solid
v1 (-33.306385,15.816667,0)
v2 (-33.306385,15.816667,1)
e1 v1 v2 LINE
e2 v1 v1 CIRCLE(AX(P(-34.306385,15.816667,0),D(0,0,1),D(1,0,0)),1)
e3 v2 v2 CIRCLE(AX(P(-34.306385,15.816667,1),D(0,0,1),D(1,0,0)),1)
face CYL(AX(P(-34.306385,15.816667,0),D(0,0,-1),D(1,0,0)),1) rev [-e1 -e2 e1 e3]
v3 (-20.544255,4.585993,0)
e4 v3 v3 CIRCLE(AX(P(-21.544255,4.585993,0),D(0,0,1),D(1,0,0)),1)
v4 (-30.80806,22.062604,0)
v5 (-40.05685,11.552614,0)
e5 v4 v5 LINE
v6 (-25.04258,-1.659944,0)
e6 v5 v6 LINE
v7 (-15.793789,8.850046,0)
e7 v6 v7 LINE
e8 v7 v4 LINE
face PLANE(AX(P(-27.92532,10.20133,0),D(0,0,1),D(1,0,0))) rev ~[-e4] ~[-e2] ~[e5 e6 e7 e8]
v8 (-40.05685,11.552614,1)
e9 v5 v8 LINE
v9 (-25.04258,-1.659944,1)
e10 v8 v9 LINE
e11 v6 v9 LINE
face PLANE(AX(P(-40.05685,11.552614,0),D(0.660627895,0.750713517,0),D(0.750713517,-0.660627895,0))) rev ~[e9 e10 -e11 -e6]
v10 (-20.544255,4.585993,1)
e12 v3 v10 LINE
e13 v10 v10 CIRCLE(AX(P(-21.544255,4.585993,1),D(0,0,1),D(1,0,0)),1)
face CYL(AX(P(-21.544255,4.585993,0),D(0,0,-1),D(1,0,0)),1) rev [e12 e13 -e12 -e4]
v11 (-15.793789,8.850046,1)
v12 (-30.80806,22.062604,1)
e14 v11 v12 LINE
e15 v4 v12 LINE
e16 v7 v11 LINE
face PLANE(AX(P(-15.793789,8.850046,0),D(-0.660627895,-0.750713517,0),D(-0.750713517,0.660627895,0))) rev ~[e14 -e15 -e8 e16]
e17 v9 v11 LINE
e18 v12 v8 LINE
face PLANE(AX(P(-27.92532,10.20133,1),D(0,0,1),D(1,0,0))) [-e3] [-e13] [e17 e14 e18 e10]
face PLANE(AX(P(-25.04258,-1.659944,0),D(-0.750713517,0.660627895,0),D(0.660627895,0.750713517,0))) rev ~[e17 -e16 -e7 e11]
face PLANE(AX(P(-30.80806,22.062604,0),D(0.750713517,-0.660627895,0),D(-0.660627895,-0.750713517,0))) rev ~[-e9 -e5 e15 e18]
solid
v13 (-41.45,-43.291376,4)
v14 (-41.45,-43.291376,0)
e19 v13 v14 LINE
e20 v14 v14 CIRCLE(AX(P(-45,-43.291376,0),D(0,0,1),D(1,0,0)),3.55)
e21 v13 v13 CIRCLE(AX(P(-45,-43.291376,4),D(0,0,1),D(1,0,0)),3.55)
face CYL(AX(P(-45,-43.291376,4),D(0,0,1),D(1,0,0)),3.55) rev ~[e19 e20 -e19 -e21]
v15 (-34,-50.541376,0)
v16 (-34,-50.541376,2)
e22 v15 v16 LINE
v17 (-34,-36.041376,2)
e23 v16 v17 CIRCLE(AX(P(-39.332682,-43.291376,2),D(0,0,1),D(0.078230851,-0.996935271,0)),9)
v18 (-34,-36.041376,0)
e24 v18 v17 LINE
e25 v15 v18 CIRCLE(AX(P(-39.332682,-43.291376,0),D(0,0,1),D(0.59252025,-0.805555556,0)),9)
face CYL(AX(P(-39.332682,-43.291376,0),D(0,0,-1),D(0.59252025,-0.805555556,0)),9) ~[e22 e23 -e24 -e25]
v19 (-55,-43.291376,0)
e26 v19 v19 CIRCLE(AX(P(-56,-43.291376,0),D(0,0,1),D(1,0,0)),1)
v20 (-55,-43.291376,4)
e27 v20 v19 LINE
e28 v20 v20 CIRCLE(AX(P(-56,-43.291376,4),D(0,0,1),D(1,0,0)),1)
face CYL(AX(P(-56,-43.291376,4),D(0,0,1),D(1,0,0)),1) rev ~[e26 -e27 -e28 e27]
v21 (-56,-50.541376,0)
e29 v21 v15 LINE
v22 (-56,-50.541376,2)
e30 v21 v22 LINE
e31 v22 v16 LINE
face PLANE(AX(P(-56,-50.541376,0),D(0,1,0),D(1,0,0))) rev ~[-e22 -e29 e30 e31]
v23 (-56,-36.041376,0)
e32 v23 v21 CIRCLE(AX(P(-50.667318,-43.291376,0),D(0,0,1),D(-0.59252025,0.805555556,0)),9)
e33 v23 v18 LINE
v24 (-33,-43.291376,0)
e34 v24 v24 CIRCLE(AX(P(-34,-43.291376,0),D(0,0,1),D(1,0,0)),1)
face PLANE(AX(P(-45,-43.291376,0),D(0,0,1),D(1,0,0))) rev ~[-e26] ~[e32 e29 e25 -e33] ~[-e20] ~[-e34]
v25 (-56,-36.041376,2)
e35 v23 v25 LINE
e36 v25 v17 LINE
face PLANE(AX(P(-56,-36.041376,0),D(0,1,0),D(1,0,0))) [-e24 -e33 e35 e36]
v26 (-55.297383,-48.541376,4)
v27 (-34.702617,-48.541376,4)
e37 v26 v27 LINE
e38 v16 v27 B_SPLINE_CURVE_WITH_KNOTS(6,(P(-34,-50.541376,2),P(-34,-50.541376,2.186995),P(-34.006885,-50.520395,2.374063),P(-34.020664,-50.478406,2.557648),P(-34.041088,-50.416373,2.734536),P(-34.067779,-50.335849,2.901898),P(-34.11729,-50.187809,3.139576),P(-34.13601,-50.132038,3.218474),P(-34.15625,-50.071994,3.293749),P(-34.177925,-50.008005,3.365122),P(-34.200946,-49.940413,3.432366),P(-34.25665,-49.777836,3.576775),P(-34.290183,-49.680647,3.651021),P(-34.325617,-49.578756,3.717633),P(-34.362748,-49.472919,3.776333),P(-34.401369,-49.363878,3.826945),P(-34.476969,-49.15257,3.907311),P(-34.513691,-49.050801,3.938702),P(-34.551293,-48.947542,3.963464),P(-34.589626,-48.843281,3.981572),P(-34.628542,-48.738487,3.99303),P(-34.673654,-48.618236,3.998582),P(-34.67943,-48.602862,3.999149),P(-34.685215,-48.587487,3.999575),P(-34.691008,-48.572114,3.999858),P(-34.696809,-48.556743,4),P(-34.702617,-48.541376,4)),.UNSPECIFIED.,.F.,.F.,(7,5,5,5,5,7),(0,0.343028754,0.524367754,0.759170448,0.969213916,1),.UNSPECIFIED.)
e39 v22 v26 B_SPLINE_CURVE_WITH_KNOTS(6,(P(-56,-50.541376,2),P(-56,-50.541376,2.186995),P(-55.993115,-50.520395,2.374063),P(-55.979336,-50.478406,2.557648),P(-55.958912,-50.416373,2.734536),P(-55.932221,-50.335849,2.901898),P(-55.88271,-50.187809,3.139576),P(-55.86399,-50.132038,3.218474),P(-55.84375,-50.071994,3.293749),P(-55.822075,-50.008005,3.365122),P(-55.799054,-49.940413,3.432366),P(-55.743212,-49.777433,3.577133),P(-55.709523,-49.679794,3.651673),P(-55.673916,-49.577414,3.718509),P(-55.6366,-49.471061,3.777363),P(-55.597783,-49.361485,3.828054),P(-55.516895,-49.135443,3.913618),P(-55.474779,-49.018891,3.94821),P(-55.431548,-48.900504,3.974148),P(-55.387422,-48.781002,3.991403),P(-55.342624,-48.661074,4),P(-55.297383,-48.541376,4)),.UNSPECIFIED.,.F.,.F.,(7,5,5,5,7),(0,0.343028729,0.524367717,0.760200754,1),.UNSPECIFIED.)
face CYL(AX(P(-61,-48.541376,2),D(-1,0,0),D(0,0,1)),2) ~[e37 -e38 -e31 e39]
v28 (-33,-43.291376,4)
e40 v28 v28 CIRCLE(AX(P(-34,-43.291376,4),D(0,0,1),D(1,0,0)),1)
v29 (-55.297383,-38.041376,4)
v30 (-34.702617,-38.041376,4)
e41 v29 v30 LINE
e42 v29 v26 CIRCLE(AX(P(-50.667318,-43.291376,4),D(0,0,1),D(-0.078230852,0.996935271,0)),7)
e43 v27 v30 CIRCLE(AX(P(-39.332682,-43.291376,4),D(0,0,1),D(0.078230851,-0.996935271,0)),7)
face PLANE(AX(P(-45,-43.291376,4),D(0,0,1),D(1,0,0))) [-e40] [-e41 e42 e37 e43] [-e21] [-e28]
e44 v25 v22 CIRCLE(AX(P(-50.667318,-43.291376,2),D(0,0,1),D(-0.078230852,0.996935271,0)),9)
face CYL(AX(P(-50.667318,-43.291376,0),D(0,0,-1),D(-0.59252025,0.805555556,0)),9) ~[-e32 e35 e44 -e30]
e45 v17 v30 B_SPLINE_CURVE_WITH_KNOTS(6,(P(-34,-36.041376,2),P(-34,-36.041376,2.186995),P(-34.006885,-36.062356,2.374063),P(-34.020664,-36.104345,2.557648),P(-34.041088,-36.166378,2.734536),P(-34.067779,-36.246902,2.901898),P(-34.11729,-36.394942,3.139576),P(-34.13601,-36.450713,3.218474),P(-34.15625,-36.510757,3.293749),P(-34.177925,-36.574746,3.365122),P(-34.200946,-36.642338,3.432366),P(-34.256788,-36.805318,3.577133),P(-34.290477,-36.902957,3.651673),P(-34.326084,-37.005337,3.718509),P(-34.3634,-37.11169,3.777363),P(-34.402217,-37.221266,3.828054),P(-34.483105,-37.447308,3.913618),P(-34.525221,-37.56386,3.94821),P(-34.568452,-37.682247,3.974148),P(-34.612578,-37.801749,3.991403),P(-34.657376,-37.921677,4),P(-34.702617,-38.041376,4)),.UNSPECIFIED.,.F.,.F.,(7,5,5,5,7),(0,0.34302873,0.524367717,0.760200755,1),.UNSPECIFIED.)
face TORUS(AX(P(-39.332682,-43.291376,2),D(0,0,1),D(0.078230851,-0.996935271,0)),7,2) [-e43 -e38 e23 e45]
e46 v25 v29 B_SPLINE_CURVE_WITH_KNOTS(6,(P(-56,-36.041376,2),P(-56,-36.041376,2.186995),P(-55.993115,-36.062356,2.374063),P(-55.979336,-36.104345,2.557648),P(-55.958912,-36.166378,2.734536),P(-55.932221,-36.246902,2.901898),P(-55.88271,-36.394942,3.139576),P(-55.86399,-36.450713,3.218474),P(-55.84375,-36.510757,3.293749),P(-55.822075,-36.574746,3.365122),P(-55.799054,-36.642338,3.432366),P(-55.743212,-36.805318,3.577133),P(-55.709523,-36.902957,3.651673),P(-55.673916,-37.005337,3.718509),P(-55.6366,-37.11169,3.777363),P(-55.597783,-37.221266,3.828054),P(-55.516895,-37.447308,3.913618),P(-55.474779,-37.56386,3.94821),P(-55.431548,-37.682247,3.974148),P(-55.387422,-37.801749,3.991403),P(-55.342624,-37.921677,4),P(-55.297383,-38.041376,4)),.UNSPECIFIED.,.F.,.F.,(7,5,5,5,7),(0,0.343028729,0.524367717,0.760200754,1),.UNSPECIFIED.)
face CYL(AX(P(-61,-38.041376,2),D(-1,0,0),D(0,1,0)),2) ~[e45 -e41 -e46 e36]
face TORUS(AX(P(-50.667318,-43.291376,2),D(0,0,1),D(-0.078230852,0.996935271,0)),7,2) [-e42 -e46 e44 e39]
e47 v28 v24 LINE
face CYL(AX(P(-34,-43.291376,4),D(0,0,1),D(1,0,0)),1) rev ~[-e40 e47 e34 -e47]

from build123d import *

# Parameters (mm, degrees)
F0_R        = 1
F1_DEPTH    = 1
F2_W        = 22
F2_H        = 14.5
F3_DEPTH    = 4
F4_R        = 1
F4_R_2      = 3.55
F5_DEPTH    = 5
F6_T1_DEPTH = 32
F6_T4_ANGLE = 171.0262354859
F6_T6_ANGLE = 171.0262354859


# Not quite as in the source:
# - a fillet or chamfer that OpenCascade refuses, or shapes differently, is made with other operations: its cross-section is extruded or revolved along the edge and cut away or added


with BuildPart() as f1:
    # F0 (on Top) → F1 (new body)
    with BuildSketch(Plane.XY):
        Polygon((-15.7937894361, 8.8500456174), (-30.8080597745, 22.0626035153), (-40.056850303, 11.5526142783), (-25.0425799646, -1.6599436195), align=None)
        with Locations((-21.5442549757, 4.5859928413)):
            Circle(F0_R, mode=Mode.SUBTRACT)
        with Locations((-34.3063847634, 15.8166670545)):
            Circle(F0_R, mode=Mode.SUBTRACT)
    extrude(amount=F1_DEPTH)


with BuildPart() as f3:
    # F2 (on Top) → F3 (new body)
    with BuildSketch(Plane.XY):
        with Locations((-45, -43.2913755476)):
            Rectangle(F2_W, F2_H)
        with BuildLine():
            ThreePointArc((-34, -50.5413755476), (-30.3326822519, -43.2913755476), (-34, -36.0413755476))
            Line((-34, -36.0413755476), (-34, -50.5413755476))
        make_face()
        with BuildLine():
            Line((-56, -50.5413755476), (-56, -36.0413755476))
            ThreePointArc((-56, -36.0413755476), (-59.6673177481, -43.2913755476), (-56, -50.5413755476))
        make_face()
    extrude(amount=F3_DEPTH)

    # F4 (on face) → F5 (cut)
    with BuildSketch(Plane.XY.offset(4)):
        with Locations((-56, -43.2913755476)):
            Circle(F4_R)
        with Locations((-34, -43.2913755476)):
            Circle(F4_R)
        with Locations((-45, -43.2913755476)):
            Circle(F4_R_2)
    extrude(amount=-F5_DEPTH, mode=Mode.SUBTRACT)

    # F6: fillet of radius 2 on 4 edges, made by hand

    # F6_s2 → F6_t1 (cut)
    with BuildSketch(Plane.YZ.offset(-61)):
        with BuildLine():
            ThreePointArc((-48.5413755476, 4), (-49.95558911, 3.4142135624), (-50.5413755476, 2))
            Line((-50.5413755476, 2), (-50.5413755476, 4))
            Line((-50.5413755476, 4), (-48.5413755476, 4))
        make_face()
        with BuildLine():
            ThreePointArc((-36.0413755476, 2), (-36.6271619853, 3.4142135624), (-38.0413755476, 4))
            Line((-38.0413755476, 4), (-36.0413755476, 4))
            Line((-36.0413755476, 4), (-36.0413755476, 2))
        make_face()
    extrude(amount=F6_T1_DEPTH, mode=Mode.SUBTRACT)

    # F6_s3 → F6_t4 (revolve, cut)
    with BuildSketch(Plane(origin=(-53.7335722058, -4.2165456866, 0), x_dir=(0, 0, 1), z_dir=(0.9969352706, 0.0782308516, 0))):
        with BuildLine():
            ThreePointArc((2, 30.1949517804), (3.4142135624, 30.7807382181), (4, 32.1949517804))
            Line((4, 32.1949517804), (4, 30.1949517804))
            Line((4, 30.1949517804), (2, 30.1949517804))
        make_face()
    revolve(axis=Axis((-50.6673177481, -43.2913755476, 4), (0, 0, 1)), revolution_arc=F6_T4_ANGLE, mode=Mode.SUBTRACT)

    # F6_s5 → F6_t6 (revolve, cut)
    with BuildSketch(Plane(origin=(-42.4683054286, -3.33254505, 0), x_dir=(0, 0, 1), z_dir=(-0.9969352706, -0.0782308516, 0))):
        with BuildLine():
            ThreePointArc((2, -49.0816699683), (3.4142135624, -48.4958835307), (4, -47.0816699683))
            Line((4, -47.0816699683), (4, -49.0816699683))
            Line((4, -49.0816699683), (2, -49.0816699683))
        make_face()
    revolve(axis=Axis((-39.3326822519, -43.2913755476, 4), (0, 0, 1)), revolution_arc=F6_T6_ANGLE, mode=Mode.SUBTRACT)


solid = Compound([f1.part, f3.part])
